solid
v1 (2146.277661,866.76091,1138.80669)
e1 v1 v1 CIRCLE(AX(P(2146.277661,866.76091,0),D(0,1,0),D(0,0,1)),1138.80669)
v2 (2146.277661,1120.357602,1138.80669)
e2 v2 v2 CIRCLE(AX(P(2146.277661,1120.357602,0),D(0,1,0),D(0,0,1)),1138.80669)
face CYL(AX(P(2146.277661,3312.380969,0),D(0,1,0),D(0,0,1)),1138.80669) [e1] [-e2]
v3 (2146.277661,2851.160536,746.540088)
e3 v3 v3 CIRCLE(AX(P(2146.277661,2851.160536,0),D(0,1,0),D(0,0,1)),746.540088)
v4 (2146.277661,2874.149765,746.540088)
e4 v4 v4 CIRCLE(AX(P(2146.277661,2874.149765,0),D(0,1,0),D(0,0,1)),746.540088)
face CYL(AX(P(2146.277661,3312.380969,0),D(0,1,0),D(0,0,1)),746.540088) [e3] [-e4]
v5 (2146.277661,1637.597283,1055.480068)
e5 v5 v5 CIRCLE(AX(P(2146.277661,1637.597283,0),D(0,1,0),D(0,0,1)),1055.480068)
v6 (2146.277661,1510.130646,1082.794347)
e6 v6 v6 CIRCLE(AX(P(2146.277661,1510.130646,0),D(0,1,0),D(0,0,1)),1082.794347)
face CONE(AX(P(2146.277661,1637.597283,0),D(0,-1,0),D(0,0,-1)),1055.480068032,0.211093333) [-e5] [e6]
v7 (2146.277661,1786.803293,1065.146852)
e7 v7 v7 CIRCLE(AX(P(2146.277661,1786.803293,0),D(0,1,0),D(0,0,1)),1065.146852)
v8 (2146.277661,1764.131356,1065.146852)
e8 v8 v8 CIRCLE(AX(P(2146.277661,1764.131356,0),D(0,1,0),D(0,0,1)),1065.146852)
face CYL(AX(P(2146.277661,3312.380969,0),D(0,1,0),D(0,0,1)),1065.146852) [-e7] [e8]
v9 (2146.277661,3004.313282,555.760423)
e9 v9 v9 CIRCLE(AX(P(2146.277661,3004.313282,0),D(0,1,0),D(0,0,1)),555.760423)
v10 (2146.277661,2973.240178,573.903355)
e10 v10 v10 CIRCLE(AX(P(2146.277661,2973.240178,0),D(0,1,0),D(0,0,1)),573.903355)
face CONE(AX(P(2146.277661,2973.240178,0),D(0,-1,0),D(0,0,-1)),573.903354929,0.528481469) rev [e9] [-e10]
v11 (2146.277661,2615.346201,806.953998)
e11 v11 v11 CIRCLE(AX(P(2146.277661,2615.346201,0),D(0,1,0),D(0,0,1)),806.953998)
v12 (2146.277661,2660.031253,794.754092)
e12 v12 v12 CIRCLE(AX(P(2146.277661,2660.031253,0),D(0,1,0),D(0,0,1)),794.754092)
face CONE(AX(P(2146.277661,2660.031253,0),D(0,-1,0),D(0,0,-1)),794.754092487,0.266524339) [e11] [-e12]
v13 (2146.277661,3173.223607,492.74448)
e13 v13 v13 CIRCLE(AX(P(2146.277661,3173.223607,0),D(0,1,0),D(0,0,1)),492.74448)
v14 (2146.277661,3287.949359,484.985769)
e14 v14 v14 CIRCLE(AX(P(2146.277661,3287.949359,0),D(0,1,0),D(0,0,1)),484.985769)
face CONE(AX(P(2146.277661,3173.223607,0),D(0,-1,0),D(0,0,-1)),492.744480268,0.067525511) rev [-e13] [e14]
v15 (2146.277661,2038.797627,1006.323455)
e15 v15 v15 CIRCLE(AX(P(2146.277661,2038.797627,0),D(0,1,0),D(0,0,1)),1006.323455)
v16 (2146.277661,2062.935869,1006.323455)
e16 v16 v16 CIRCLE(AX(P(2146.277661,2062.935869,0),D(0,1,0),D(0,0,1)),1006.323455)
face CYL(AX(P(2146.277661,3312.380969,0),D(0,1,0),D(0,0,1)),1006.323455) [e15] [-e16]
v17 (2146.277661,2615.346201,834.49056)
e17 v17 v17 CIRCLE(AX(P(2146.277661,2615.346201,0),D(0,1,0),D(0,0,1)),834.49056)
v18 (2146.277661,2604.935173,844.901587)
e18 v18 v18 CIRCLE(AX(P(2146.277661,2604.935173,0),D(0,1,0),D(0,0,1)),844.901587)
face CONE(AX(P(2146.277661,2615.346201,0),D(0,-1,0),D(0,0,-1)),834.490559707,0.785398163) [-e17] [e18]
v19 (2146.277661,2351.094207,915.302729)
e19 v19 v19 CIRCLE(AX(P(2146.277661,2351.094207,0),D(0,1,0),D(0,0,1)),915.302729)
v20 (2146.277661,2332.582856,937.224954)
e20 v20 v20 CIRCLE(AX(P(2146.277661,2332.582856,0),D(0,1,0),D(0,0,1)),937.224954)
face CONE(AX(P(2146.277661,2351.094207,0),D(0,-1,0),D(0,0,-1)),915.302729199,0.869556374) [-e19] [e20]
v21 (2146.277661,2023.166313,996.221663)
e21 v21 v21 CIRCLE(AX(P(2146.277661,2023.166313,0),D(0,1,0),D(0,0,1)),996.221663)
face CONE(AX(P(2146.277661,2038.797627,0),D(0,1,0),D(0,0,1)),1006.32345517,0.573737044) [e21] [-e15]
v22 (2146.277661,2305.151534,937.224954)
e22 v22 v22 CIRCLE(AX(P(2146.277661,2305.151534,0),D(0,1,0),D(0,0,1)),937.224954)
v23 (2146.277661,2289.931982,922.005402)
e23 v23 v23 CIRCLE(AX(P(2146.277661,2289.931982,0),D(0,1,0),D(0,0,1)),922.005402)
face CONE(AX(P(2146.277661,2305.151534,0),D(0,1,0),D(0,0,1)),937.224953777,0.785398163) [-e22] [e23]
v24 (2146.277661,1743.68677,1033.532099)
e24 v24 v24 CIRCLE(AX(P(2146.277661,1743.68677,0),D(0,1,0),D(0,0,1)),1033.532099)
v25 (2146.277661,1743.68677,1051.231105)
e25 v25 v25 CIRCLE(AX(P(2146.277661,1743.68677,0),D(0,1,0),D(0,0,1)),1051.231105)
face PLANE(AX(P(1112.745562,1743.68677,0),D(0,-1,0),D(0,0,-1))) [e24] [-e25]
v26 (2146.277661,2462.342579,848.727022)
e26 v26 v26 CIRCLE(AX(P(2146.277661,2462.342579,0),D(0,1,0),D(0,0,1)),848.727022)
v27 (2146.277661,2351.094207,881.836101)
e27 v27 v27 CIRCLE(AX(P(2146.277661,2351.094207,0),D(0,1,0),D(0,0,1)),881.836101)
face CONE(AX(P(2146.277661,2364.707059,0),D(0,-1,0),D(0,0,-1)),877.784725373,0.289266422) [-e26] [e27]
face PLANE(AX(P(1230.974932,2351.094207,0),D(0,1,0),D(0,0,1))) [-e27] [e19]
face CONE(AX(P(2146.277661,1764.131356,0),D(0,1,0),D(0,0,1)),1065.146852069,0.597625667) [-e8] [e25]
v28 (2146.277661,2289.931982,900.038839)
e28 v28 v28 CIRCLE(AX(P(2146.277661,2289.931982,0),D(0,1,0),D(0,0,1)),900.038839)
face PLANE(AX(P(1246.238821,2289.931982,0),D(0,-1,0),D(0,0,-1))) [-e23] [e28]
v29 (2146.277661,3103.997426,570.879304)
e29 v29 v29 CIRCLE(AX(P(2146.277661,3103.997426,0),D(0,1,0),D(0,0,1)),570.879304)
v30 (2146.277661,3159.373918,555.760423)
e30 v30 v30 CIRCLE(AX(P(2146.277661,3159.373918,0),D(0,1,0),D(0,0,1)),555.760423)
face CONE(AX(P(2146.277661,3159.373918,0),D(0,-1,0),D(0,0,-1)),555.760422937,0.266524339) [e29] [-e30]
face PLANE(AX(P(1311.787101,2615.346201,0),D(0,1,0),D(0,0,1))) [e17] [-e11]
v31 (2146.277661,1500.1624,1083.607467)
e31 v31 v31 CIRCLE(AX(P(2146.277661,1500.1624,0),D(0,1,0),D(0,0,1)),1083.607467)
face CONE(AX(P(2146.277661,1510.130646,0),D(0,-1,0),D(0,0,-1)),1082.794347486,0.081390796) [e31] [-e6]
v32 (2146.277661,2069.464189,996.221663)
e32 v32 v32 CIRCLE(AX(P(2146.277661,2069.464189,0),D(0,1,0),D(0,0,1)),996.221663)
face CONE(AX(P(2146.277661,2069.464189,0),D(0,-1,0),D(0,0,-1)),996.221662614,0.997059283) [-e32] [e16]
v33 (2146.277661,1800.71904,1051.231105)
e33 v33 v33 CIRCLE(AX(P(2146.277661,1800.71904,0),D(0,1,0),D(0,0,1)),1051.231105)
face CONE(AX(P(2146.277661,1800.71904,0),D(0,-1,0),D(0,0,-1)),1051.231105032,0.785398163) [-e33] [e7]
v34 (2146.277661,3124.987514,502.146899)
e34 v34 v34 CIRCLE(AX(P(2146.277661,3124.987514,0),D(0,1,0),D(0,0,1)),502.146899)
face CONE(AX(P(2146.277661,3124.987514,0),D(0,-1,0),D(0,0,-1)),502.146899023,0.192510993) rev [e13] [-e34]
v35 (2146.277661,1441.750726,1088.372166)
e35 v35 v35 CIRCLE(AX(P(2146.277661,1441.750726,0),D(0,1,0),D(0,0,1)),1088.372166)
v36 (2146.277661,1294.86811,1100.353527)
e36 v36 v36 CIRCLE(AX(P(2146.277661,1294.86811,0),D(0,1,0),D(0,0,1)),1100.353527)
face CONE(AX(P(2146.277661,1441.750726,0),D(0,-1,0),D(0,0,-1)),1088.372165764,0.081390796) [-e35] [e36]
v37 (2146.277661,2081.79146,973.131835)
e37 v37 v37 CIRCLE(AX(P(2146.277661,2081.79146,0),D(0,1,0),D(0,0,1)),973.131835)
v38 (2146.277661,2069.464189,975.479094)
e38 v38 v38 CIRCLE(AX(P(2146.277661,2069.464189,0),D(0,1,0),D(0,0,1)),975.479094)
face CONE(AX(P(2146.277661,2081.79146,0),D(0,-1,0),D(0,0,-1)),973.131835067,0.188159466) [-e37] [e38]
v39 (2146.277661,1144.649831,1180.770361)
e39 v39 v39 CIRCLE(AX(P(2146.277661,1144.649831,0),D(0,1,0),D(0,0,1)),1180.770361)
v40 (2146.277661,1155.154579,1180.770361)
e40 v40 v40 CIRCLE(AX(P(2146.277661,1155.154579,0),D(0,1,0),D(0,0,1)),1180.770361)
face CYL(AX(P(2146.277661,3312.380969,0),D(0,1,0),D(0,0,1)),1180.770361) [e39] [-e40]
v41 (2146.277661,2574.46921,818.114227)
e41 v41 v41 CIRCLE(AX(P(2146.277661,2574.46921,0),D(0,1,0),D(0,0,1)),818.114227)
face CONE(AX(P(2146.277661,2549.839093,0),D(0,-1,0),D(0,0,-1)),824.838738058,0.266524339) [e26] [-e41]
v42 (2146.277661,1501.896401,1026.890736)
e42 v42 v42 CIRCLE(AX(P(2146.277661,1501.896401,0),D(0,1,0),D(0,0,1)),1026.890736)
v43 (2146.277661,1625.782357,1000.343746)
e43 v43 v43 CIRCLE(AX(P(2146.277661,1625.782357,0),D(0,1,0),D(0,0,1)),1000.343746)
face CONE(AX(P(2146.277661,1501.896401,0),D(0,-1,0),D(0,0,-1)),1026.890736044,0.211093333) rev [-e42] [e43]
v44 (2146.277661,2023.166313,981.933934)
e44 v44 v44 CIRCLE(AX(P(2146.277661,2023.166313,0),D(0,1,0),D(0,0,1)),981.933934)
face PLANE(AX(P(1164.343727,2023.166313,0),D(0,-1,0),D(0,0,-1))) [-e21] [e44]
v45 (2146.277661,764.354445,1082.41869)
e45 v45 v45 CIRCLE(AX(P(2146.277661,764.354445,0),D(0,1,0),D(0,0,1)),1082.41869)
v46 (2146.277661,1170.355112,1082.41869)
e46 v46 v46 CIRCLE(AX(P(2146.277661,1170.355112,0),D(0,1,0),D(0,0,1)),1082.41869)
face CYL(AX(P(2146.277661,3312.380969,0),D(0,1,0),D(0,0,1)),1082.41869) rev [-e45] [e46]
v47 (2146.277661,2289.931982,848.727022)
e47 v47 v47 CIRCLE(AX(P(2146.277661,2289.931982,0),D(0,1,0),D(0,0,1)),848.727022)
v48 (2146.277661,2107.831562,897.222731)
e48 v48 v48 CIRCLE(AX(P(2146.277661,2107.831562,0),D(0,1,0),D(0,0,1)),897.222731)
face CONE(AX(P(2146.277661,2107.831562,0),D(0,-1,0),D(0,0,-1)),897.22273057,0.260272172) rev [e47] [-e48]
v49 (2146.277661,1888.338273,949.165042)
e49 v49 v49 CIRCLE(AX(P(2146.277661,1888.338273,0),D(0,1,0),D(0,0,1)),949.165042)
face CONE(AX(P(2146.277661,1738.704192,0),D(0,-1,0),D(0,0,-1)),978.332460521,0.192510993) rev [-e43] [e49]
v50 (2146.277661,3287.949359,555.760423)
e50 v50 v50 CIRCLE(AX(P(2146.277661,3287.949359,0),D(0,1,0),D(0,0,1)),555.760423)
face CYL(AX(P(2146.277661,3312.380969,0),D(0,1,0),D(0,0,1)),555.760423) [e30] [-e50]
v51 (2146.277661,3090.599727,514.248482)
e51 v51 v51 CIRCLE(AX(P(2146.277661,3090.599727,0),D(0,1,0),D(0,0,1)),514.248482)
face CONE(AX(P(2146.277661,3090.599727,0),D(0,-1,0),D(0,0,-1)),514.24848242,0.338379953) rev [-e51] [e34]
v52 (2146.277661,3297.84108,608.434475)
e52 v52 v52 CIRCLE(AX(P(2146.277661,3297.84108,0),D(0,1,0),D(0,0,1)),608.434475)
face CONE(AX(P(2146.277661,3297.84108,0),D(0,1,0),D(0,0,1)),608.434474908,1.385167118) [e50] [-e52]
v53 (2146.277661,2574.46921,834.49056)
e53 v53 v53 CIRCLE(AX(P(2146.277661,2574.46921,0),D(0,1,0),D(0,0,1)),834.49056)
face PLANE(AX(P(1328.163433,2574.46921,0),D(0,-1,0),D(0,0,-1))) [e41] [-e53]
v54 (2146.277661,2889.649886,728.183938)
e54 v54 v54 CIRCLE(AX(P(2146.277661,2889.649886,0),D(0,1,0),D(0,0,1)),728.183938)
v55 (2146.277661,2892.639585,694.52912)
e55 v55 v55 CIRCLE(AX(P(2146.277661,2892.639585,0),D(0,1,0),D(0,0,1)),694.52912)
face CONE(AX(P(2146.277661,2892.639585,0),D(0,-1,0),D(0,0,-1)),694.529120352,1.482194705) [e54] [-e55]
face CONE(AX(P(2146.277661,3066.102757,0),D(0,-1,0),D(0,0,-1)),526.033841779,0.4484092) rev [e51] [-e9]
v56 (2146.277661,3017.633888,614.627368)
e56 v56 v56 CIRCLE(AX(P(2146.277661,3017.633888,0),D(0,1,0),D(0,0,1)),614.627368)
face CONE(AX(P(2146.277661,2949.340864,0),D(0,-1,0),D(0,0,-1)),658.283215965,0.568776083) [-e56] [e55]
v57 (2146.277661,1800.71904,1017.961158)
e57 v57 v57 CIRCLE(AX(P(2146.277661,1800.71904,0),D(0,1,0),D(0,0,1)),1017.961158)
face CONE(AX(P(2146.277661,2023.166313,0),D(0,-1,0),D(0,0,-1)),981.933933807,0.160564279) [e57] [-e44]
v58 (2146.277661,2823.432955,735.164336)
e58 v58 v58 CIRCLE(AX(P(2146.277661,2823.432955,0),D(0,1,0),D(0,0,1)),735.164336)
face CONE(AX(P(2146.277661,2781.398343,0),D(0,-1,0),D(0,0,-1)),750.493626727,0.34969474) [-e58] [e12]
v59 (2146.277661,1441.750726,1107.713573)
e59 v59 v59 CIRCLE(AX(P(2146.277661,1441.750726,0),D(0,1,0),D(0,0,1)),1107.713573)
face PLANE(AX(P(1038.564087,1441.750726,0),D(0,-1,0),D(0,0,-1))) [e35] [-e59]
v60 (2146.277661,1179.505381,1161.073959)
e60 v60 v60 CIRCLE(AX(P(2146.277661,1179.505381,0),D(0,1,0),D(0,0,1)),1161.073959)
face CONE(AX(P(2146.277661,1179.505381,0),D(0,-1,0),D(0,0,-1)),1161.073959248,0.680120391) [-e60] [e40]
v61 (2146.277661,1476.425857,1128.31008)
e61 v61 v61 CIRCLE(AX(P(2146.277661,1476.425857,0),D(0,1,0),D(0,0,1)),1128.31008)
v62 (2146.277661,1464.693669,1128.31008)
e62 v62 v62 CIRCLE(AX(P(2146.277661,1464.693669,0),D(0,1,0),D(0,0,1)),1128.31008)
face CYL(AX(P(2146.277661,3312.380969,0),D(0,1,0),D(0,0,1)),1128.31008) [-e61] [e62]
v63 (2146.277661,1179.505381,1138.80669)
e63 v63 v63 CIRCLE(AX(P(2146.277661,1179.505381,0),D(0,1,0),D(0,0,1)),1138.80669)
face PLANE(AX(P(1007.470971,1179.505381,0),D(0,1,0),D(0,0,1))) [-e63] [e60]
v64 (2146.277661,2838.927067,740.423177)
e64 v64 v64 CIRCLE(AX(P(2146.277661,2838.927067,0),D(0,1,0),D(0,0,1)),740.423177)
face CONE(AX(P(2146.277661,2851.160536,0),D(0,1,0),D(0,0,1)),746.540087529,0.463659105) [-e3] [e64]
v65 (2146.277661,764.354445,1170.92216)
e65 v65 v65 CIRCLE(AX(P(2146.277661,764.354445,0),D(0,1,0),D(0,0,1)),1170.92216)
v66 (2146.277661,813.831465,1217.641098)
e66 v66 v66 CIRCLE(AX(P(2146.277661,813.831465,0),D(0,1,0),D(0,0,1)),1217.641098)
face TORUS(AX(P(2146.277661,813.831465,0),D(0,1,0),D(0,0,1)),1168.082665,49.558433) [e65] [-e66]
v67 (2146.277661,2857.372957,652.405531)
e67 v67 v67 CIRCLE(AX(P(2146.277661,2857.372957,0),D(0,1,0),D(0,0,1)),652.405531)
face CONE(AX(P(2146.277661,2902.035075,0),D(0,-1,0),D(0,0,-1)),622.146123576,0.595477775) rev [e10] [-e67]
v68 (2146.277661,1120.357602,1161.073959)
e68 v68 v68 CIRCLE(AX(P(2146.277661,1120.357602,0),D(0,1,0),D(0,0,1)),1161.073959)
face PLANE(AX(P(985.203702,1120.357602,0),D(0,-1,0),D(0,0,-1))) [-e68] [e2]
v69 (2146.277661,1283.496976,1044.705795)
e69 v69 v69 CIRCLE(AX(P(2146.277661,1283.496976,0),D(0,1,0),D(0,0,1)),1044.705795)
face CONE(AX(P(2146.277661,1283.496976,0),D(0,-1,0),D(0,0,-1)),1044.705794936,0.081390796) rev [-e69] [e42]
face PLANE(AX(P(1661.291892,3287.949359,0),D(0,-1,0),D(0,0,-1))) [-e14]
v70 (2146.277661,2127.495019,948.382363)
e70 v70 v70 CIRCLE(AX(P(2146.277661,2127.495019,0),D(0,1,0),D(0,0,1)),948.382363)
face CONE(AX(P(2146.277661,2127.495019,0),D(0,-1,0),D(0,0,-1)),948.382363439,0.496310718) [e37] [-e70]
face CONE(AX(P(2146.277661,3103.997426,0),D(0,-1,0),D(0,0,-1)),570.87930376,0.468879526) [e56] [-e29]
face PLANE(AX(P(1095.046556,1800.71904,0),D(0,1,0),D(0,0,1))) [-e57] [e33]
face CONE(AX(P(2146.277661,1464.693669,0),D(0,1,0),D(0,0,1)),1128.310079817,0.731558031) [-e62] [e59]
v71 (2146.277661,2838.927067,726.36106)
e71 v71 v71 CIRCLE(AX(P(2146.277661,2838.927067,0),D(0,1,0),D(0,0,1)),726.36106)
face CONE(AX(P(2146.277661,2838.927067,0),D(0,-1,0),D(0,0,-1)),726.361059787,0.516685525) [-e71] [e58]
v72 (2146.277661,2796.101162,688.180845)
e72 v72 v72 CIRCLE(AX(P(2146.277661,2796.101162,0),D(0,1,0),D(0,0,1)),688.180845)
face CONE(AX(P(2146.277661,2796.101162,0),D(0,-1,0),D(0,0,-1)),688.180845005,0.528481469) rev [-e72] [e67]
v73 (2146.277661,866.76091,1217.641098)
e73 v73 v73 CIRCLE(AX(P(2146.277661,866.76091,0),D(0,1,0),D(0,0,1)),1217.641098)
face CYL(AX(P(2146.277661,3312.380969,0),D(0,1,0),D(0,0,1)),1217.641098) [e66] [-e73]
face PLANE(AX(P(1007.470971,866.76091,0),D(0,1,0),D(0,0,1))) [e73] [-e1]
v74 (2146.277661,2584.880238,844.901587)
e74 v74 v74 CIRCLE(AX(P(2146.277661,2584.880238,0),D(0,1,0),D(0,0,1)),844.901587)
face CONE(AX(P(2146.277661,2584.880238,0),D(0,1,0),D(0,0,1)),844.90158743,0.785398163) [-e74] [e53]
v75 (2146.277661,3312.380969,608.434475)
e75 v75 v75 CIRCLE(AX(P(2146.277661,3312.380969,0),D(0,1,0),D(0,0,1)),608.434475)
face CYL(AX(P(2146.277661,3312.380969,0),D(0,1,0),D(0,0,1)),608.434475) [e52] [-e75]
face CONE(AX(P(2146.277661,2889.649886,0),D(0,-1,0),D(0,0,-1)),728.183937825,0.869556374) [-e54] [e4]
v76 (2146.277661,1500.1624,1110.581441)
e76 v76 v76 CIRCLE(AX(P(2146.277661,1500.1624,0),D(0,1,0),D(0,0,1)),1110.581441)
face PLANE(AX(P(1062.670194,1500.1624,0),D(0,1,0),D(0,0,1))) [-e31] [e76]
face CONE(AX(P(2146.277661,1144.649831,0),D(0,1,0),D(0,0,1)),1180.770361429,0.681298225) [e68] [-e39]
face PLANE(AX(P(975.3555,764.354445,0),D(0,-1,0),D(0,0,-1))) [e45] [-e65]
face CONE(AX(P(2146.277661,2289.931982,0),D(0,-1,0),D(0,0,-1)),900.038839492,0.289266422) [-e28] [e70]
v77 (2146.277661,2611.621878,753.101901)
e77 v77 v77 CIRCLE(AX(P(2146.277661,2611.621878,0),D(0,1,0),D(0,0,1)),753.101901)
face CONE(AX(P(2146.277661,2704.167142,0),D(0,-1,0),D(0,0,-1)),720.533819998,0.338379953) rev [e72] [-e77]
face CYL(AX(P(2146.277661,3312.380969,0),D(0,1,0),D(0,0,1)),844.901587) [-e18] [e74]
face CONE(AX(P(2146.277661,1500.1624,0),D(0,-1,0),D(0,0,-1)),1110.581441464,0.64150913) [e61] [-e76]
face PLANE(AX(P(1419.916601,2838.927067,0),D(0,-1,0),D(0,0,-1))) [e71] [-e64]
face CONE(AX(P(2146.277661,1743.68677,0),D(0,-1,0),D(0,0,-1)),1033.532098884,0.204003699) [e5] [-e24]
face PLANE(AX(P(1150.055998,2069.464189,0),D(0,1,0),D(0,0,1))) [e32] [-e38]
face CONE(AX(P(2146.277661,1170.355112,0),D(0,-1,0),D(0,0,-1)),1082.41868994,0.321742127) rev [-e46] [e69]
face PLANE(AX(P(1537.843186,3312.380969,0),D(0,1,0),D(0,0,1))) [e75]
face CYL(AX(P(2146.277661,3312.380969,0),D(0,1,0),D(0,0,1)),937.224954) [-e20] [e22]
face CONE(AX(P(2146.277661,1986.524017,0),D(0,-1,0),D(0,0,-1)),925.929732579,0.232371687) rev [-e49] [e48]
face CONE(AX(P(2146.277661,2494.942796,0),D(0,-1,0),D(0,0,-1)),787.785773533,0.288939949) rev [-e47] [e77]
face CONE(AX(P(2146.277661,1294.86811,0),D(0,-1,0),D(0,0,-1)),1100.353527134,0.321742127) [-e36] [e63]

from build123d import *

# Parameters (mm, degrees)
SCALE2_SCALE = 0.6


# Read off the part's stored shape, not the designer's step: Revolve3
with BuildPart() as part:
    # Revolve3 outline → Revolve3 (revolve)
    with BuildSketch(Plane(origin=(2146.277660785, 0, 0), x_dir=(1, 0, 0), z_dir=(0, 0, 1))):
        with BuildLine():
            ThreePointArc((1951.536933898, 25.275712267), (2006.859500309, 51.03010733), (2029.401830459, 107.737413481))
            Line((2029.401830459, 107.737413481), (2029.401830459, 195.953154978))
            Line((2029.401830459, 195.953154978), (1898.0111499, 195.953154978))
            Line((1898.0111499, 195.953154978), (1898.0111499, 618.614307742))
            Line((1898.0111499, 618.614307742), (1935.123265413, 618.614307742))
            Line((1935.123265413, 618.614307742), (1967.950602382, 659.101356671))
            Line((1967.950602382, 659.101356671), (1967.950602382, 676.609269721))
            Line((1967.950602382, 676.609269721), (1935.123265413, 717.193939638))
            Line((1935.123265413, 717.193939638), (1898.0111499, 717.193939638))
            Line((1898.0111499, 717.193939638), (1833.922545223, 909.465155038))
            Line((1833.922545223, 909.465155038), (1813.953609607, 1154.269513894))
            Line((1813.953609607, 1154.269513894), (1846.189289159, 1154.269513894))
            Line((1846.189289159, 1154.269513894), (1880.516799695, 1192.507753479))
            Line((1880.516799695, 1192.507753479), (1880.516799695, 1212.061398721))
            Line((1880.516799695, 1212.061398721), (1850.969069107, 1251.622304154))
            Line((1850.969069107, 1251.622304154), (1806.012445447, 1251.622304154))
            Line((1806.012445447, 1251.622304154), (1804.657245809, 1268.236047856))
            Line((1804.657245809, 1268.236047856), (1759.13344672, 1480.680443604))
            Line((1759.13344672, 1480.680443604), (1722.553498139, 1657.496254903))
            Line((1722.553498139, 1657.496254903), (1752.051841719, 1657.496254903))
            Line((1752.051841719, 1657.496254903), (1775.244753449, 1691.570564677))
            Line((1775.244753449, 1691.570564677), (1775.244753449, 1729.357126839))
            Line((1775.244753449, 1729.357126839), (1752.051841719, 1752.550038568))
            Line((1752.051841719, 1752.550038568), (1696.601929641, 1752.550038568))
            Line((1696.601929641, 1752.550038568), (1636.556556345, 2123.295493405))
            Line((1636.556556345, 2123.295493405), (1660.36943769, 2123.295493405))
            Line((1660.36943769, 2123.295493405), (1677.205758617, 2149.347682028))
            Line((1677.205758617, 2149.347682028), (1677.205758617, 2189.578086415))
            Line((1677.205758617, 2189.578086415), (1660.36943769, 2200.45861958))
            Line((1660.36943769, 2200.45861958), (1625.798490416, 2200.45861958))
            Line((1625.798490416, 2200.45861958), (1621.886391778, 2221.004071879))
            Line((1621.886391778, 2221.004071879), (1580.637272399, 2297.176668723))
            Line((1580.637272399, 2297.176668723), (1500.064732486, 2567.904941416))
            Line((1500.064732486, 2567.904941416), (1536.675669529, 2567.904941416))
            Line((1536.675669529, 2567.904941416), (1562.041589628, 2593.270861514))
            Line((1562.041589628, 2593.270861514), (1562.041589628, 2638.989731947))
            Line((1562.041589628, 2638.989731947), (1525.504548665, 2669.841983248))
            Line((1525.504548665, 2669.841983248), (1469.726835783, 2669.841983248))
            Line((1469.726835783, 2669.841983248), (1414.545036921, 2855.255935771))
            Line((1414.545036921, 2855.255935771), (1363.523712468, 3042.133655208))
            Line((1363.523712468, 3042.133655208), (1390.817599511, 3042.133655208))
            Line((1390.817599511, 3042.133655208), (1408.169312383, 3059.48536808))
            Line((1408.169312383, 3059.48536808), (1408.169312383, 3092.910259985))
            Line((1408.169312383, 3092.910259985), (1390.817599511, 3110.261972858))
            Line((1390.817599511, 3110.261972858), (1344.923330305, 3110.261972858))
            Line((1344.923330305, 3110.261972858), (1324.590154146, 3184.737060096))
            Line((1324.590154146, 3184.737060096), (1225.273892586, 3457.073228648))
            Line((1225.273892586, 3457.073228648), (1210.601766313, 3482.896748881))
            Line((1210.601766313, 3482.896748881), (1234.038628603, 3482.896748881))
            Line((1234.038628603, 3482.896748881), (1244.233479215, 3503.285864136))
            Line((1244.233479215, 3503.285864136), (1244.233479215, 3541.601246474))
            Line((1244.233479215, 3541.601246474), (1213.639896375, 3567.434780912))
            Line((1213.639896375, 3567.434780912), (1157.54853392, 3572.417612227))
            Line((1157.54853392, 3572.417612227), (1024.378946718, 3780.741450818))
            Line((1024.378946718, 3780.741450818), (951.465506267, 3924.680681197))
            Line((951.465506267, 3924.680681197), (926.267371562, 4016.974834635))
            Line((926.267371562, 4016.974834635), (926.267371562, 4231.26723546))
            Line((926.267371562, 4231.26723546), (1014.05745818, 4247.753437864))
            Line((1014.05745818, 4247.753437864), (1014.05745818, 4271.986586525))
            Line((1014.05745818, 4271.986586525), (0, 4271.986586525))
            Line((0, 4271.986586525), (0, 4231.26723546))
            Line((0, 4231.26723546), (808.309615376, 4231.26723546))
            Line((808.309615376, 4231.26723546), (821.240800447, 4040.05764866))
            Line((821.240800447, 4040.05764866), (836.911498372, 3959.664161501))
            Line((836.911498372, 3959.664161501), (857.080804033, 3902.351183577))
            Line((857.080804033, 3902.351183577), (926.267371562, 3758.540440497))
            Line((926.267371562, 3758.540440497), (956.505591549, 3706.751934895))
            Line((956.505591549, 3706.751934895), (1087.342551957, 3513.639900071))
            Line((1087.342551957, 3513.639900071), (1146.968075009, 3411.520240383))
            Line((1146.968075009, 3411.520240383), (1255.169835341, 3104.054767564))
            Line((1255.169835341, 3104.054767564), (1414.545036921, 2567.904941416))
            Line((1414.545036921, 2567.904941416), (1495.371217617, 2264.404240867))
            Line((1495.371217617, 2264.404240867), (1581.941736744, 1898.582092252))
            Line((1581.941736744, 1898.582092252), (1667.239575845, 1460.988899845))
            Line((1667.239575845, 1460.988899845), (1711.484560073, 1254.512306782))
            Line((1711.484560073, 1254.512306782), (1741.176324893, 890.513263993))
            Line((1741.176324893, 890.513263993), (1804.0311499, 701.943491585))
            Line((1804.0311499, 701.943491585), (1804.0311499, 25.275712267))
            Line((1804.0311499, 25.275712267), (1951.536933898, 25.275712267))
        make_face()
    revolve(axis=Axis((2146.277660785, 0, 0), (0, 1, 0)))


with BuildPart() as part_1:
    # Scale2: scaled about (2146.277660785, 1872.972543286, 0)
    add(part.part.scale(SCALE2_SCALE).moved(Location((858.511064314, 749.189017314, 0))))


solid = part_1.part
